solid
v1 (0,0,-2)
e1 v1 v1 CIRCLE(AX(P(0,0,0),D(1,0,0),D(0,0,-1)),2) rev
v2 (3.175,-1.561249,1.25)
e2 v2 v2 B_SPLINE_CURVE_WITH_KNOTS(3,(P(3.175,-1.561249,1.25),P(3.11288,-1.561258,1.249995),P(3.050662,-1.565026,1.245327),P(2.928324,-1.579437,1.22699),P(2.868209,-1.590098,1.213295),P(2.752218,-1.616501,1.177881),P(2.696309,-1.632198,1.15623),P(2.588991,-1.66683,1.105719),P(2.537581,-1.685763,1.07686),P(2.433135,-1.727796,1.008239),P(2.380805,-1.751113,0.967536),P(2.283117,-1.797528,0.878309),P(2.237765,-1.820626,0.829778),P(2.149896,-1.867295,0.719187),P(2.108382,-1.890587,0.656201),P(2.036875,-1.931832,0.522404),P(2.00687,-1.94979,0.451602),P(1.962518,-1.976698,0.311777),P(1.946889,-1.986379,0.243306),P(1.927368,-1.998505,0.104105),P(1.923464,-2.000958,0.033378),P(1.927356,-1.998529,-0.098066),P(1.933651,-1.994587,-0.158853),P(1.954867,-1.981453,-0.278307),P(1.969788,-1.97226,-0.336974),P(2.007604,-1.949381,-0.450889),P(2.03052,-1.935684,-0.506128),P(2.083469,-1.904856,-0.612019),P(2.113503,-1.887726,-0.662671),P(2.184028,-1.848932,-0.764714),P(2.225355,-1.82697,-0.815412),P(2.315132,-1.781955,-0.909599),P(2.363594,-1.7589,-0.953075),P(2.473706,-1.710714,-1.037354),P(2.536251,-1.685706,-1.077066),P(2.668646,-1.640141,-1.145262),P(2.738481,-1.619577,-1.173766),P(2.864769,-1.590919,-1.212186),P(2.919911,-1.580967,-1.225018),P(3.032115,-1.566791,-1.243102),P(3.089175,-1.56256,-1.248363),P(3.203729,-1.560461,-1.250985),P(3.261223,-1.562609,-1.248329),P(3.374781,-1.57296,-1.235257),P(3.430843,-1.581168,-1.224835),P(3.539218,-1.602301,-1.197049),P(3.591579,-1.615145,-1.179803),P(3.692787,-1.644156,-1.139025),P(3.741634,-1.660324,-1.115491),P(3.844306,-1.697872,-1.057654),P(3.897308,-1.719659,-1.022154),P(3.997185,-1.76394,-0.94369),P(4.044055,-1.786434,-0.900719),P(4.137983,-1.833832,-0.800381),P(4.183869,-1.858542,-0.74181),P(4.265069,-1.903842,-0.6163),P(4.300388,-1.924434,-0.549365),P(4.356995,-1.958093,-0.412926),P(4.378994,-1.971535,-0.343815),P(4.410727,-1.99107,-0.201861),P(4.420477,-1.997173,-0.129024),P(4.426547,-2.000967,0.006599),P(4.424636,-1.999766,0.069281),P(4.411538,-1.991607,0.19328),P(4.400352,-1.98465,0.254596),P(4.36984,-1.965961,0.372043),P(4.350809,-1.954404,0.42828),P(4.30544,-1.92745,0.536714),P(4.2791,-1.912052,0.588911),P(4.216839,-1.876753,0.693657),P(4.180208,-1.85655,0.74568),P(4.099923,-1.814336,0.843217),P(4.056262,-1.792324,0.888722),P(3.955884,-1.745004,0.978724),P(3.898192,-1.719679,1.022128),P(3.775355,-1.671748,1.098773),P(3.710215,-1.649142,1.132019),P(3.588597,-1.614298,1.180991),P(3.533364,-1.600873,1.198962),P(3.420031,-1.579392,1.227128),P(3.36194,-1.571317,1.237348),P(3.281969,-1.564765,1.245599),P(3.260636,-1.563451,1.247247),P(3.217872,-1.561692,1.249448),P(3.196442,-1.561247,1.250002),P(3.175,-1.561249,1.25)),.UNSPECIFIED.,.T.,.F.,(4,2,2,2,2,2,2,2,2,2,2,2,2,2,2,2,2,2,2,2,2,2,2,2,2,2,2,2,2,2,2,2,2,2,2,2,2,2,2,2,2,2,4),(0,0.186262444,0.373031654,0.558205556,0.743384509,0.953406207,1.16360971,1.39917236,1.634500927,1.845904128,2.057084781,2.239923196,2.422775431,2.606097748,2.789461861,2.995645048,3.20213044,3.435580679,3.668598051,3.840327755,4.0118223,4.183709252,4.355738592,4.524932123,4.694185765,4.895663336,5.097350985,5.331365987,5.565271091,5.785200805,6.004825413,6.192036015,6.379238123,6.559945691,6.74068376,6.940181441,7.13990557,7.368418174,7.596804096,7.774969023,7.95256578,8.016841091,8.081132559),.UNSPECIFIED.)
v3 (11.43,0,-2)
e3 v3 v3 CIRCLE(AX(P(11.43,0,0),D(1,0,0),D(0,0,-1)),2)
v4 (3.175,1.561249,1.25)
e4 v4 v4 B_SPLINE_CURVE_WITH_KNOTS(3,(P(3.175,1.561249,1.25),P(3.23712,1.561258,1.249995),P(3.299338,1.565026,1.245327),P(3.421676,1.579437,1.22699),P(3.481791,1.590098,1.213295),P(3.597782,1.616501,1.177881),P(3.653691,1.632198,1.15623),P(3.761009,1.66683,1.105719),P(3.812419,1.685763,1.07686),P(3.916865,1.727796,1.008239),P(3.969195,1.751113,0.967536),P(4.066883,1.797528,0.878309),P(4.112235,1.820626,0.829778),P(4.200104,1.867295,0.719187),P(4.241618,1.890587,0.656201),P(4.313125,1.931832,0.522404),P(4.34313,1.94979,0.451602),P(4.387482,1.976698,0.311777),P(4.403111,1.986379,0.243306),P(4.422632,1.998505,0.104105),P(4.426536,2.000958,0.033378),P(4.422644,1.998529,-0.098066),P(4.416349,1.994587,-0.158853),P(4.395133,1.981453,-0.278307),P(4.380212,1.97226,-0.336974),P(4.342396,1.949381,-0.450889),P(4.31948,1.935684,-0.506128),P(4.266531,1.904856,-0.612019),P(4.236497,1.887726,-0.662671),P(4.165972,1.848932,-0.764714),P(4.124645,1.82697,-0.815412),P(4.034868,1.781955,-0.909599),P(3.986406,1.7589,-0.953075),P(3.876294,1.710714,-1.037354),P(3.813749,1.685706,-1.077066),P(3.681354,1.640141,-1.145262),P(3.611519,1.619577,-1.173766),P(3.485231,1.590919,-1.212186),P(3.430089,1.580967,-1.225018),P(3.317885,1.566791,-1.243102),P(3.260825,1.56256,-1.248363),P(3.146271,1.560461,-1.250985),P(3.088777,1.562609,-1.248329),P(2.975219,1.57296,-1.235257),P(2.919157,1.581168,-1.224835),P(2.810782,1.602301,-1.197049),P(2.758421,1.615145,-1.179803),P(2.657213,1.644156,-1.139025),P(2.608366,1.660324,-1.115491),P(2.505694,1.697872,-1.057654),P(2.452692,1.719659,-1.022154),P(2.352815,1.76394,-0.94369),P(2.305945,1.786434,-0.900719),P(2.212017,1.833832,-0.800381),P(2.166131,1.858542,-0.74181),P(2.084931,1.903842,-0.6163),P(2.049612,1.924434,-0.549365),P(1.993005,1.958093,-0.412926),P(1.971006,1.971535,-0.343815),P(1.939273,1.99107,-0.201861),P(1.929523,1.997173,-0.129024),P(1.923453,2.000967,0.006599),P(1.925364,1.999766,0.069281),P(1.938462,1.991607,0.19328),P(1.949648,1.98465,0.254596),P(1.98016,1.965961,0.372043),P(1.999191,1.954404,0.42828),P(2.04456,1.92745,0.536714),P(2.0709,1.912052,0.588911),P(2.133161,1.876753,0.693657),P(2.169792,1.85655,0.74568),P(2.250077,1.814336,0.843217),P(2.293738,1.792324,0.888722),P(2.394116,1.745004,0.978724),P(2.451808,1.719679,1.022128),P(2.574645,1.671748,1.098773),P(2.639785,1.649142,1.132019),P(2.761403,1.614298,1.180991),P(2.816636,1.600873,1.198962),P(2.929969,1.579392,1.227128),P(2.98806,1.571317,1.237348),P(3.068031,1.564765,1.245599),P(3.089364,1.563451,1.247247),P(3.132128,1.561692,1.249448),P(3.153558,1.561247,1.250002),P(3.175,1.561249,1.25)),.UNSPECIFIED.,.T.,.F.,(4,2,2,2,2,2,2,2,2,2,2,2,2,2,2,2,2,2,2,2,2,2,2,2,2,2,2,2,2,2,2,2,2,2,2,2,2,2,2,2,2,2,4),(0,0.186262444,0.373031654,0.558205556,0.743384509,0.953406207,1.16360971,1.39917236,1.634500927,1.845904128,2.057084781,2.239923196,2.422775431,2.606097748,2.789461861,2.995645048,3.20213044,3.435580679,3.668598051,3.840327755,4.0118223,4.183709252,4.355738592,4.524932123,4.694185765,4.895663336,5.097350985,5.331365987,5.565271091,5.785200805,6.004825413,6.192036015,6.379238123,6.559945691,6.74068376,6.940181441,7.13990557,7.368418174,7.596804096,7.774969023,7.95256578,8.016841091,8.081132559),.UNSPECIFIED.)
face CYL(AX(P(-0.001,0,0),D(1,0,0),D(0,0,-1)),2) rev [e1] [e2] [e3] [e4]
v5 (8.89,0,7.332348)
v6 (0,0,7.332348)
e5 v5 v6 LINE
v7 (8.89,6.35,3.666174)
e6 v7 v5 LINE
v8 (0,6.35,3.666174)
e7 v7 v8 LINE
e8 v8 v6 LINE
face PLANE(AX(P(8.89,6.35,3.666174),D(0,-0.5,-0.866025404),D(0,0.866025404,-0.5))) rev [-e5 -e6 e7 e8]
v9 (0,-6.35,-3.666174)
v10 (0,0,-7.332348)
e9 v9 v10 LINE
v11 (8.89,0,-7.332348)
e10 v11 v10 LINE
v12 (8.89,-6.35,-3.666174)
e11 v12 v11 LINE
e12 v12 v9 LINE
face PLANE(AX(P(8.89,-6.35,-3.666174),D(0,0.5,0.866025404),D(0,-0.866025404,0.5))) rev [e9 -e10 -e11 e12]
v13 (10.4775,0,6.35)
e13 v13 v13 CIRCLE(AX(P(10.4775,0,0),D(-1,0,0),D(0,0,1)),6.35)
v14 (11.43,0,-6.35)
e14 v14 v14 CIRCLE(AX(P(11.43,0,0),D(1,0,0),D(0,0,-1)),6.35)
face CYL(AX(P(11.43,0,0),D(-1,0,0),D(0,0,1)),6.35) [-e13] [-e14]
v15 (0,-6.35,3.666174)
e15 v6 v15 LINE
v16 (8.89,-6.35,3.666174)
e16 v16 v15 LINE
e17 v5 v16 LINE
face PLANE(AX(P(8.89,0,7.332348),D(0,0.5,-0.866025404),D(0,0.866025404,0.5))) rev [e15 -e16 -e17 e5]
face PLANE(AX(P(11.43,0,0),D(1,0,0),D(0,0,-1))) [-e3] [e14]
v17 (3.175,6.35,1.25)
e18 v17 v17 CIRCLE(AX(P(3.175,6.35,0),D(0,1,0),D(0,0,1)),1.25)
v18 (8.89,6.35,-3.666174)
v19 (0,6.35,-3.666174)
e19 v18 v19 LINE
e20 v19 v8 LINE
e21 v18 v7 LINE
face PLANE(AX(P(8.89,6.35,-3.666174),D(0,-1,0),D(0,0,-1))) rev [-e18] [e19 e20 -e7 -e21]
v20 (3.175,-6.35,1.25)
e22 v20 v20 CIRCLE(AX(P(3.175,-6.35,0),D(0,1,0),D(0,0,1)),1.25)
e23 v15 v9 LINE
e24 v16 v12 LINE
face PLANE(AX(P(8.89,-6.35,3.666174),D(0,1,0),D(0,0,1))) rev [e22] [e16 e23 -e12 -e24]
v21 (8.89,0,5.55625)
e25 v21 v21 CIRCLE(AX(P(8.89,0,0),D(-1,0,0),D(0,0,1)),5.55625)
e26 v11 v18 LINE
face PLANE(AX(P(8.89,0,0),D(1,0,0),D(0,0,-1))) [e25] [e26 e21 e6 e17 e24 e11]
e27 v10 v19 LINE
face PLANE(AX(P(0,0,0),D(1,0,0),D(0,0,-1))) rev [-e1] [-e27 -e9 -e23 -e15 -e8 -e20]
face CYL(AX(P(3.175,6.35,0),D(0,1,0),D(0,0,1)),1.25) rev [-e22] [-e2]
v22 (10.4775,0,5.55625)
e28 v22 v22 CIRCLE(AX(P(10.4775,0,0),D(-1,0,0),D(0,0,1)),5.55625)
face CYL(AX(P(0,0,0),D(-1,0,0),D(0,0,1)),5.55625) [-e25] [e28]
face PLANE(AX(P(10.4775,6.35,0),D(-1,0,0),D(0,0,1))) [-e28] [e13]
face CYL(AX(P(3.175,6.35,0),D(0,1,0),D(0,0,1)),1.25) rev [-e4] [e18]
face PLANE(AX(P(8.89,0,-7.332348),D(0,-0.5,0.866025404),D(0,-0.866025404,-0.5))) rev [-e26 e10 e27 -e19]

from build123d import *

# Parameters (mm, degrees)
BOSS_EXTRUDE1_DEPTH     = 8.89
SKETCH3_R               = 6.35
BOSS_EXTRUDE2_DEPTH     = 2.54
SKETCH4_W               = 1.5875
SKETCH4_H               = 0.79375
CUT_EXTRUDE1_REACH      = 16.991
SKETCH6_R               = 2
ADVANCEDHOLE1_START     = -6.35
ADVANCEDHOLE1_OUTLINE_R = 1.25
ADVANCEDHOLE1_DEPTH     = 12.7


# Read off the part's stored shape, not the designer's step: AdvancedHole1
with BuildPart() as part:
    # Sketch2 → Boss-Extrude1 (new body)
    with BuildSketch(Plane(origin=(0, 0, 0), x_dir=(0, 0, -1), z_dir=(1, 0, 0))):
        Polygon((7.332348419, 0), (3.666174209, 6.35), (-3.666174209, 6.35), (-7.332348419, 0), (-3.666174209, -6.35), (3.666174209, -6.35), align=None)
    extrude(amount=BOSS_EXTRUDE1_DEPTH)

    # Sketch3 → Boss-Extrude2 (add)
    with BuildSketch(Plane(origin=(8.89, 0, 0), x_dir=(0, 0, -1), z_dir=(1, 0, 0))):
        with Locations(Location((0, 0, 0), (0, 0, 150))):
            Circle(SKETCH3_R)
    extrude(amount=BOSS_EXTRUDE2_DEPTH)

    # Sketch4 → Cut-Revolve1 (revolve, cut)
    with BuildSketch(Plane.XY, mode=Mode.PRIVATE) as cut_revolve1_sk:
        with Locations((9.68375, 5.953125)):
            Rectangle(SKETCH4_W, SKETCH4_H)
    revolve(cut_revolve1_sk.sketch.rotate(Axis((0, 0, 0), (1, 0, 0)), 90), axis=Axis((0, 0, 0), (1, 0, 0)), mode=Mode.SUBTRACT)

    # Sketch6 → Cut-Extrude1 (cut, up to next)
    with BuildSketch(Plane(origin=(11.43, 0, 0), x_dir=(0, 0, -1), z_dir=(1, 0, 0)), mode=Mode.PRIVATE) as cut_extrude1_sk1:
        Circle(SKETCH6_R)
    cut_extrude1_tool1 = extrude(cut_extrude1_sk1.sketch, amount=-CUT_EXTRUDE1_REACH, mode=Mode.PRIVATE) & part.part
    add(cut_extrude1_tool1.solids().sort_by_distance((11.43, 0, 0))[0], mode=Mode.SUBTRACT)

    # AdvancedHole1 outline → AdvancedHole1 (cut)
    with BuildSketch(Plane(origin=(0, 0, 0), x_dir=(1, 0, 0), z_dir=(0, 1, 0)).offset(ADVANCEDHOLE1_START)):
        with Locations((3.175, 0)):
            Circle(ADVANCEDHOLE1_OUTLINE_R)
    extrude(amount=ADVANCEDHOLE1_DEPTH, mode=Mode.SUBTRACT)


solid = part.part
